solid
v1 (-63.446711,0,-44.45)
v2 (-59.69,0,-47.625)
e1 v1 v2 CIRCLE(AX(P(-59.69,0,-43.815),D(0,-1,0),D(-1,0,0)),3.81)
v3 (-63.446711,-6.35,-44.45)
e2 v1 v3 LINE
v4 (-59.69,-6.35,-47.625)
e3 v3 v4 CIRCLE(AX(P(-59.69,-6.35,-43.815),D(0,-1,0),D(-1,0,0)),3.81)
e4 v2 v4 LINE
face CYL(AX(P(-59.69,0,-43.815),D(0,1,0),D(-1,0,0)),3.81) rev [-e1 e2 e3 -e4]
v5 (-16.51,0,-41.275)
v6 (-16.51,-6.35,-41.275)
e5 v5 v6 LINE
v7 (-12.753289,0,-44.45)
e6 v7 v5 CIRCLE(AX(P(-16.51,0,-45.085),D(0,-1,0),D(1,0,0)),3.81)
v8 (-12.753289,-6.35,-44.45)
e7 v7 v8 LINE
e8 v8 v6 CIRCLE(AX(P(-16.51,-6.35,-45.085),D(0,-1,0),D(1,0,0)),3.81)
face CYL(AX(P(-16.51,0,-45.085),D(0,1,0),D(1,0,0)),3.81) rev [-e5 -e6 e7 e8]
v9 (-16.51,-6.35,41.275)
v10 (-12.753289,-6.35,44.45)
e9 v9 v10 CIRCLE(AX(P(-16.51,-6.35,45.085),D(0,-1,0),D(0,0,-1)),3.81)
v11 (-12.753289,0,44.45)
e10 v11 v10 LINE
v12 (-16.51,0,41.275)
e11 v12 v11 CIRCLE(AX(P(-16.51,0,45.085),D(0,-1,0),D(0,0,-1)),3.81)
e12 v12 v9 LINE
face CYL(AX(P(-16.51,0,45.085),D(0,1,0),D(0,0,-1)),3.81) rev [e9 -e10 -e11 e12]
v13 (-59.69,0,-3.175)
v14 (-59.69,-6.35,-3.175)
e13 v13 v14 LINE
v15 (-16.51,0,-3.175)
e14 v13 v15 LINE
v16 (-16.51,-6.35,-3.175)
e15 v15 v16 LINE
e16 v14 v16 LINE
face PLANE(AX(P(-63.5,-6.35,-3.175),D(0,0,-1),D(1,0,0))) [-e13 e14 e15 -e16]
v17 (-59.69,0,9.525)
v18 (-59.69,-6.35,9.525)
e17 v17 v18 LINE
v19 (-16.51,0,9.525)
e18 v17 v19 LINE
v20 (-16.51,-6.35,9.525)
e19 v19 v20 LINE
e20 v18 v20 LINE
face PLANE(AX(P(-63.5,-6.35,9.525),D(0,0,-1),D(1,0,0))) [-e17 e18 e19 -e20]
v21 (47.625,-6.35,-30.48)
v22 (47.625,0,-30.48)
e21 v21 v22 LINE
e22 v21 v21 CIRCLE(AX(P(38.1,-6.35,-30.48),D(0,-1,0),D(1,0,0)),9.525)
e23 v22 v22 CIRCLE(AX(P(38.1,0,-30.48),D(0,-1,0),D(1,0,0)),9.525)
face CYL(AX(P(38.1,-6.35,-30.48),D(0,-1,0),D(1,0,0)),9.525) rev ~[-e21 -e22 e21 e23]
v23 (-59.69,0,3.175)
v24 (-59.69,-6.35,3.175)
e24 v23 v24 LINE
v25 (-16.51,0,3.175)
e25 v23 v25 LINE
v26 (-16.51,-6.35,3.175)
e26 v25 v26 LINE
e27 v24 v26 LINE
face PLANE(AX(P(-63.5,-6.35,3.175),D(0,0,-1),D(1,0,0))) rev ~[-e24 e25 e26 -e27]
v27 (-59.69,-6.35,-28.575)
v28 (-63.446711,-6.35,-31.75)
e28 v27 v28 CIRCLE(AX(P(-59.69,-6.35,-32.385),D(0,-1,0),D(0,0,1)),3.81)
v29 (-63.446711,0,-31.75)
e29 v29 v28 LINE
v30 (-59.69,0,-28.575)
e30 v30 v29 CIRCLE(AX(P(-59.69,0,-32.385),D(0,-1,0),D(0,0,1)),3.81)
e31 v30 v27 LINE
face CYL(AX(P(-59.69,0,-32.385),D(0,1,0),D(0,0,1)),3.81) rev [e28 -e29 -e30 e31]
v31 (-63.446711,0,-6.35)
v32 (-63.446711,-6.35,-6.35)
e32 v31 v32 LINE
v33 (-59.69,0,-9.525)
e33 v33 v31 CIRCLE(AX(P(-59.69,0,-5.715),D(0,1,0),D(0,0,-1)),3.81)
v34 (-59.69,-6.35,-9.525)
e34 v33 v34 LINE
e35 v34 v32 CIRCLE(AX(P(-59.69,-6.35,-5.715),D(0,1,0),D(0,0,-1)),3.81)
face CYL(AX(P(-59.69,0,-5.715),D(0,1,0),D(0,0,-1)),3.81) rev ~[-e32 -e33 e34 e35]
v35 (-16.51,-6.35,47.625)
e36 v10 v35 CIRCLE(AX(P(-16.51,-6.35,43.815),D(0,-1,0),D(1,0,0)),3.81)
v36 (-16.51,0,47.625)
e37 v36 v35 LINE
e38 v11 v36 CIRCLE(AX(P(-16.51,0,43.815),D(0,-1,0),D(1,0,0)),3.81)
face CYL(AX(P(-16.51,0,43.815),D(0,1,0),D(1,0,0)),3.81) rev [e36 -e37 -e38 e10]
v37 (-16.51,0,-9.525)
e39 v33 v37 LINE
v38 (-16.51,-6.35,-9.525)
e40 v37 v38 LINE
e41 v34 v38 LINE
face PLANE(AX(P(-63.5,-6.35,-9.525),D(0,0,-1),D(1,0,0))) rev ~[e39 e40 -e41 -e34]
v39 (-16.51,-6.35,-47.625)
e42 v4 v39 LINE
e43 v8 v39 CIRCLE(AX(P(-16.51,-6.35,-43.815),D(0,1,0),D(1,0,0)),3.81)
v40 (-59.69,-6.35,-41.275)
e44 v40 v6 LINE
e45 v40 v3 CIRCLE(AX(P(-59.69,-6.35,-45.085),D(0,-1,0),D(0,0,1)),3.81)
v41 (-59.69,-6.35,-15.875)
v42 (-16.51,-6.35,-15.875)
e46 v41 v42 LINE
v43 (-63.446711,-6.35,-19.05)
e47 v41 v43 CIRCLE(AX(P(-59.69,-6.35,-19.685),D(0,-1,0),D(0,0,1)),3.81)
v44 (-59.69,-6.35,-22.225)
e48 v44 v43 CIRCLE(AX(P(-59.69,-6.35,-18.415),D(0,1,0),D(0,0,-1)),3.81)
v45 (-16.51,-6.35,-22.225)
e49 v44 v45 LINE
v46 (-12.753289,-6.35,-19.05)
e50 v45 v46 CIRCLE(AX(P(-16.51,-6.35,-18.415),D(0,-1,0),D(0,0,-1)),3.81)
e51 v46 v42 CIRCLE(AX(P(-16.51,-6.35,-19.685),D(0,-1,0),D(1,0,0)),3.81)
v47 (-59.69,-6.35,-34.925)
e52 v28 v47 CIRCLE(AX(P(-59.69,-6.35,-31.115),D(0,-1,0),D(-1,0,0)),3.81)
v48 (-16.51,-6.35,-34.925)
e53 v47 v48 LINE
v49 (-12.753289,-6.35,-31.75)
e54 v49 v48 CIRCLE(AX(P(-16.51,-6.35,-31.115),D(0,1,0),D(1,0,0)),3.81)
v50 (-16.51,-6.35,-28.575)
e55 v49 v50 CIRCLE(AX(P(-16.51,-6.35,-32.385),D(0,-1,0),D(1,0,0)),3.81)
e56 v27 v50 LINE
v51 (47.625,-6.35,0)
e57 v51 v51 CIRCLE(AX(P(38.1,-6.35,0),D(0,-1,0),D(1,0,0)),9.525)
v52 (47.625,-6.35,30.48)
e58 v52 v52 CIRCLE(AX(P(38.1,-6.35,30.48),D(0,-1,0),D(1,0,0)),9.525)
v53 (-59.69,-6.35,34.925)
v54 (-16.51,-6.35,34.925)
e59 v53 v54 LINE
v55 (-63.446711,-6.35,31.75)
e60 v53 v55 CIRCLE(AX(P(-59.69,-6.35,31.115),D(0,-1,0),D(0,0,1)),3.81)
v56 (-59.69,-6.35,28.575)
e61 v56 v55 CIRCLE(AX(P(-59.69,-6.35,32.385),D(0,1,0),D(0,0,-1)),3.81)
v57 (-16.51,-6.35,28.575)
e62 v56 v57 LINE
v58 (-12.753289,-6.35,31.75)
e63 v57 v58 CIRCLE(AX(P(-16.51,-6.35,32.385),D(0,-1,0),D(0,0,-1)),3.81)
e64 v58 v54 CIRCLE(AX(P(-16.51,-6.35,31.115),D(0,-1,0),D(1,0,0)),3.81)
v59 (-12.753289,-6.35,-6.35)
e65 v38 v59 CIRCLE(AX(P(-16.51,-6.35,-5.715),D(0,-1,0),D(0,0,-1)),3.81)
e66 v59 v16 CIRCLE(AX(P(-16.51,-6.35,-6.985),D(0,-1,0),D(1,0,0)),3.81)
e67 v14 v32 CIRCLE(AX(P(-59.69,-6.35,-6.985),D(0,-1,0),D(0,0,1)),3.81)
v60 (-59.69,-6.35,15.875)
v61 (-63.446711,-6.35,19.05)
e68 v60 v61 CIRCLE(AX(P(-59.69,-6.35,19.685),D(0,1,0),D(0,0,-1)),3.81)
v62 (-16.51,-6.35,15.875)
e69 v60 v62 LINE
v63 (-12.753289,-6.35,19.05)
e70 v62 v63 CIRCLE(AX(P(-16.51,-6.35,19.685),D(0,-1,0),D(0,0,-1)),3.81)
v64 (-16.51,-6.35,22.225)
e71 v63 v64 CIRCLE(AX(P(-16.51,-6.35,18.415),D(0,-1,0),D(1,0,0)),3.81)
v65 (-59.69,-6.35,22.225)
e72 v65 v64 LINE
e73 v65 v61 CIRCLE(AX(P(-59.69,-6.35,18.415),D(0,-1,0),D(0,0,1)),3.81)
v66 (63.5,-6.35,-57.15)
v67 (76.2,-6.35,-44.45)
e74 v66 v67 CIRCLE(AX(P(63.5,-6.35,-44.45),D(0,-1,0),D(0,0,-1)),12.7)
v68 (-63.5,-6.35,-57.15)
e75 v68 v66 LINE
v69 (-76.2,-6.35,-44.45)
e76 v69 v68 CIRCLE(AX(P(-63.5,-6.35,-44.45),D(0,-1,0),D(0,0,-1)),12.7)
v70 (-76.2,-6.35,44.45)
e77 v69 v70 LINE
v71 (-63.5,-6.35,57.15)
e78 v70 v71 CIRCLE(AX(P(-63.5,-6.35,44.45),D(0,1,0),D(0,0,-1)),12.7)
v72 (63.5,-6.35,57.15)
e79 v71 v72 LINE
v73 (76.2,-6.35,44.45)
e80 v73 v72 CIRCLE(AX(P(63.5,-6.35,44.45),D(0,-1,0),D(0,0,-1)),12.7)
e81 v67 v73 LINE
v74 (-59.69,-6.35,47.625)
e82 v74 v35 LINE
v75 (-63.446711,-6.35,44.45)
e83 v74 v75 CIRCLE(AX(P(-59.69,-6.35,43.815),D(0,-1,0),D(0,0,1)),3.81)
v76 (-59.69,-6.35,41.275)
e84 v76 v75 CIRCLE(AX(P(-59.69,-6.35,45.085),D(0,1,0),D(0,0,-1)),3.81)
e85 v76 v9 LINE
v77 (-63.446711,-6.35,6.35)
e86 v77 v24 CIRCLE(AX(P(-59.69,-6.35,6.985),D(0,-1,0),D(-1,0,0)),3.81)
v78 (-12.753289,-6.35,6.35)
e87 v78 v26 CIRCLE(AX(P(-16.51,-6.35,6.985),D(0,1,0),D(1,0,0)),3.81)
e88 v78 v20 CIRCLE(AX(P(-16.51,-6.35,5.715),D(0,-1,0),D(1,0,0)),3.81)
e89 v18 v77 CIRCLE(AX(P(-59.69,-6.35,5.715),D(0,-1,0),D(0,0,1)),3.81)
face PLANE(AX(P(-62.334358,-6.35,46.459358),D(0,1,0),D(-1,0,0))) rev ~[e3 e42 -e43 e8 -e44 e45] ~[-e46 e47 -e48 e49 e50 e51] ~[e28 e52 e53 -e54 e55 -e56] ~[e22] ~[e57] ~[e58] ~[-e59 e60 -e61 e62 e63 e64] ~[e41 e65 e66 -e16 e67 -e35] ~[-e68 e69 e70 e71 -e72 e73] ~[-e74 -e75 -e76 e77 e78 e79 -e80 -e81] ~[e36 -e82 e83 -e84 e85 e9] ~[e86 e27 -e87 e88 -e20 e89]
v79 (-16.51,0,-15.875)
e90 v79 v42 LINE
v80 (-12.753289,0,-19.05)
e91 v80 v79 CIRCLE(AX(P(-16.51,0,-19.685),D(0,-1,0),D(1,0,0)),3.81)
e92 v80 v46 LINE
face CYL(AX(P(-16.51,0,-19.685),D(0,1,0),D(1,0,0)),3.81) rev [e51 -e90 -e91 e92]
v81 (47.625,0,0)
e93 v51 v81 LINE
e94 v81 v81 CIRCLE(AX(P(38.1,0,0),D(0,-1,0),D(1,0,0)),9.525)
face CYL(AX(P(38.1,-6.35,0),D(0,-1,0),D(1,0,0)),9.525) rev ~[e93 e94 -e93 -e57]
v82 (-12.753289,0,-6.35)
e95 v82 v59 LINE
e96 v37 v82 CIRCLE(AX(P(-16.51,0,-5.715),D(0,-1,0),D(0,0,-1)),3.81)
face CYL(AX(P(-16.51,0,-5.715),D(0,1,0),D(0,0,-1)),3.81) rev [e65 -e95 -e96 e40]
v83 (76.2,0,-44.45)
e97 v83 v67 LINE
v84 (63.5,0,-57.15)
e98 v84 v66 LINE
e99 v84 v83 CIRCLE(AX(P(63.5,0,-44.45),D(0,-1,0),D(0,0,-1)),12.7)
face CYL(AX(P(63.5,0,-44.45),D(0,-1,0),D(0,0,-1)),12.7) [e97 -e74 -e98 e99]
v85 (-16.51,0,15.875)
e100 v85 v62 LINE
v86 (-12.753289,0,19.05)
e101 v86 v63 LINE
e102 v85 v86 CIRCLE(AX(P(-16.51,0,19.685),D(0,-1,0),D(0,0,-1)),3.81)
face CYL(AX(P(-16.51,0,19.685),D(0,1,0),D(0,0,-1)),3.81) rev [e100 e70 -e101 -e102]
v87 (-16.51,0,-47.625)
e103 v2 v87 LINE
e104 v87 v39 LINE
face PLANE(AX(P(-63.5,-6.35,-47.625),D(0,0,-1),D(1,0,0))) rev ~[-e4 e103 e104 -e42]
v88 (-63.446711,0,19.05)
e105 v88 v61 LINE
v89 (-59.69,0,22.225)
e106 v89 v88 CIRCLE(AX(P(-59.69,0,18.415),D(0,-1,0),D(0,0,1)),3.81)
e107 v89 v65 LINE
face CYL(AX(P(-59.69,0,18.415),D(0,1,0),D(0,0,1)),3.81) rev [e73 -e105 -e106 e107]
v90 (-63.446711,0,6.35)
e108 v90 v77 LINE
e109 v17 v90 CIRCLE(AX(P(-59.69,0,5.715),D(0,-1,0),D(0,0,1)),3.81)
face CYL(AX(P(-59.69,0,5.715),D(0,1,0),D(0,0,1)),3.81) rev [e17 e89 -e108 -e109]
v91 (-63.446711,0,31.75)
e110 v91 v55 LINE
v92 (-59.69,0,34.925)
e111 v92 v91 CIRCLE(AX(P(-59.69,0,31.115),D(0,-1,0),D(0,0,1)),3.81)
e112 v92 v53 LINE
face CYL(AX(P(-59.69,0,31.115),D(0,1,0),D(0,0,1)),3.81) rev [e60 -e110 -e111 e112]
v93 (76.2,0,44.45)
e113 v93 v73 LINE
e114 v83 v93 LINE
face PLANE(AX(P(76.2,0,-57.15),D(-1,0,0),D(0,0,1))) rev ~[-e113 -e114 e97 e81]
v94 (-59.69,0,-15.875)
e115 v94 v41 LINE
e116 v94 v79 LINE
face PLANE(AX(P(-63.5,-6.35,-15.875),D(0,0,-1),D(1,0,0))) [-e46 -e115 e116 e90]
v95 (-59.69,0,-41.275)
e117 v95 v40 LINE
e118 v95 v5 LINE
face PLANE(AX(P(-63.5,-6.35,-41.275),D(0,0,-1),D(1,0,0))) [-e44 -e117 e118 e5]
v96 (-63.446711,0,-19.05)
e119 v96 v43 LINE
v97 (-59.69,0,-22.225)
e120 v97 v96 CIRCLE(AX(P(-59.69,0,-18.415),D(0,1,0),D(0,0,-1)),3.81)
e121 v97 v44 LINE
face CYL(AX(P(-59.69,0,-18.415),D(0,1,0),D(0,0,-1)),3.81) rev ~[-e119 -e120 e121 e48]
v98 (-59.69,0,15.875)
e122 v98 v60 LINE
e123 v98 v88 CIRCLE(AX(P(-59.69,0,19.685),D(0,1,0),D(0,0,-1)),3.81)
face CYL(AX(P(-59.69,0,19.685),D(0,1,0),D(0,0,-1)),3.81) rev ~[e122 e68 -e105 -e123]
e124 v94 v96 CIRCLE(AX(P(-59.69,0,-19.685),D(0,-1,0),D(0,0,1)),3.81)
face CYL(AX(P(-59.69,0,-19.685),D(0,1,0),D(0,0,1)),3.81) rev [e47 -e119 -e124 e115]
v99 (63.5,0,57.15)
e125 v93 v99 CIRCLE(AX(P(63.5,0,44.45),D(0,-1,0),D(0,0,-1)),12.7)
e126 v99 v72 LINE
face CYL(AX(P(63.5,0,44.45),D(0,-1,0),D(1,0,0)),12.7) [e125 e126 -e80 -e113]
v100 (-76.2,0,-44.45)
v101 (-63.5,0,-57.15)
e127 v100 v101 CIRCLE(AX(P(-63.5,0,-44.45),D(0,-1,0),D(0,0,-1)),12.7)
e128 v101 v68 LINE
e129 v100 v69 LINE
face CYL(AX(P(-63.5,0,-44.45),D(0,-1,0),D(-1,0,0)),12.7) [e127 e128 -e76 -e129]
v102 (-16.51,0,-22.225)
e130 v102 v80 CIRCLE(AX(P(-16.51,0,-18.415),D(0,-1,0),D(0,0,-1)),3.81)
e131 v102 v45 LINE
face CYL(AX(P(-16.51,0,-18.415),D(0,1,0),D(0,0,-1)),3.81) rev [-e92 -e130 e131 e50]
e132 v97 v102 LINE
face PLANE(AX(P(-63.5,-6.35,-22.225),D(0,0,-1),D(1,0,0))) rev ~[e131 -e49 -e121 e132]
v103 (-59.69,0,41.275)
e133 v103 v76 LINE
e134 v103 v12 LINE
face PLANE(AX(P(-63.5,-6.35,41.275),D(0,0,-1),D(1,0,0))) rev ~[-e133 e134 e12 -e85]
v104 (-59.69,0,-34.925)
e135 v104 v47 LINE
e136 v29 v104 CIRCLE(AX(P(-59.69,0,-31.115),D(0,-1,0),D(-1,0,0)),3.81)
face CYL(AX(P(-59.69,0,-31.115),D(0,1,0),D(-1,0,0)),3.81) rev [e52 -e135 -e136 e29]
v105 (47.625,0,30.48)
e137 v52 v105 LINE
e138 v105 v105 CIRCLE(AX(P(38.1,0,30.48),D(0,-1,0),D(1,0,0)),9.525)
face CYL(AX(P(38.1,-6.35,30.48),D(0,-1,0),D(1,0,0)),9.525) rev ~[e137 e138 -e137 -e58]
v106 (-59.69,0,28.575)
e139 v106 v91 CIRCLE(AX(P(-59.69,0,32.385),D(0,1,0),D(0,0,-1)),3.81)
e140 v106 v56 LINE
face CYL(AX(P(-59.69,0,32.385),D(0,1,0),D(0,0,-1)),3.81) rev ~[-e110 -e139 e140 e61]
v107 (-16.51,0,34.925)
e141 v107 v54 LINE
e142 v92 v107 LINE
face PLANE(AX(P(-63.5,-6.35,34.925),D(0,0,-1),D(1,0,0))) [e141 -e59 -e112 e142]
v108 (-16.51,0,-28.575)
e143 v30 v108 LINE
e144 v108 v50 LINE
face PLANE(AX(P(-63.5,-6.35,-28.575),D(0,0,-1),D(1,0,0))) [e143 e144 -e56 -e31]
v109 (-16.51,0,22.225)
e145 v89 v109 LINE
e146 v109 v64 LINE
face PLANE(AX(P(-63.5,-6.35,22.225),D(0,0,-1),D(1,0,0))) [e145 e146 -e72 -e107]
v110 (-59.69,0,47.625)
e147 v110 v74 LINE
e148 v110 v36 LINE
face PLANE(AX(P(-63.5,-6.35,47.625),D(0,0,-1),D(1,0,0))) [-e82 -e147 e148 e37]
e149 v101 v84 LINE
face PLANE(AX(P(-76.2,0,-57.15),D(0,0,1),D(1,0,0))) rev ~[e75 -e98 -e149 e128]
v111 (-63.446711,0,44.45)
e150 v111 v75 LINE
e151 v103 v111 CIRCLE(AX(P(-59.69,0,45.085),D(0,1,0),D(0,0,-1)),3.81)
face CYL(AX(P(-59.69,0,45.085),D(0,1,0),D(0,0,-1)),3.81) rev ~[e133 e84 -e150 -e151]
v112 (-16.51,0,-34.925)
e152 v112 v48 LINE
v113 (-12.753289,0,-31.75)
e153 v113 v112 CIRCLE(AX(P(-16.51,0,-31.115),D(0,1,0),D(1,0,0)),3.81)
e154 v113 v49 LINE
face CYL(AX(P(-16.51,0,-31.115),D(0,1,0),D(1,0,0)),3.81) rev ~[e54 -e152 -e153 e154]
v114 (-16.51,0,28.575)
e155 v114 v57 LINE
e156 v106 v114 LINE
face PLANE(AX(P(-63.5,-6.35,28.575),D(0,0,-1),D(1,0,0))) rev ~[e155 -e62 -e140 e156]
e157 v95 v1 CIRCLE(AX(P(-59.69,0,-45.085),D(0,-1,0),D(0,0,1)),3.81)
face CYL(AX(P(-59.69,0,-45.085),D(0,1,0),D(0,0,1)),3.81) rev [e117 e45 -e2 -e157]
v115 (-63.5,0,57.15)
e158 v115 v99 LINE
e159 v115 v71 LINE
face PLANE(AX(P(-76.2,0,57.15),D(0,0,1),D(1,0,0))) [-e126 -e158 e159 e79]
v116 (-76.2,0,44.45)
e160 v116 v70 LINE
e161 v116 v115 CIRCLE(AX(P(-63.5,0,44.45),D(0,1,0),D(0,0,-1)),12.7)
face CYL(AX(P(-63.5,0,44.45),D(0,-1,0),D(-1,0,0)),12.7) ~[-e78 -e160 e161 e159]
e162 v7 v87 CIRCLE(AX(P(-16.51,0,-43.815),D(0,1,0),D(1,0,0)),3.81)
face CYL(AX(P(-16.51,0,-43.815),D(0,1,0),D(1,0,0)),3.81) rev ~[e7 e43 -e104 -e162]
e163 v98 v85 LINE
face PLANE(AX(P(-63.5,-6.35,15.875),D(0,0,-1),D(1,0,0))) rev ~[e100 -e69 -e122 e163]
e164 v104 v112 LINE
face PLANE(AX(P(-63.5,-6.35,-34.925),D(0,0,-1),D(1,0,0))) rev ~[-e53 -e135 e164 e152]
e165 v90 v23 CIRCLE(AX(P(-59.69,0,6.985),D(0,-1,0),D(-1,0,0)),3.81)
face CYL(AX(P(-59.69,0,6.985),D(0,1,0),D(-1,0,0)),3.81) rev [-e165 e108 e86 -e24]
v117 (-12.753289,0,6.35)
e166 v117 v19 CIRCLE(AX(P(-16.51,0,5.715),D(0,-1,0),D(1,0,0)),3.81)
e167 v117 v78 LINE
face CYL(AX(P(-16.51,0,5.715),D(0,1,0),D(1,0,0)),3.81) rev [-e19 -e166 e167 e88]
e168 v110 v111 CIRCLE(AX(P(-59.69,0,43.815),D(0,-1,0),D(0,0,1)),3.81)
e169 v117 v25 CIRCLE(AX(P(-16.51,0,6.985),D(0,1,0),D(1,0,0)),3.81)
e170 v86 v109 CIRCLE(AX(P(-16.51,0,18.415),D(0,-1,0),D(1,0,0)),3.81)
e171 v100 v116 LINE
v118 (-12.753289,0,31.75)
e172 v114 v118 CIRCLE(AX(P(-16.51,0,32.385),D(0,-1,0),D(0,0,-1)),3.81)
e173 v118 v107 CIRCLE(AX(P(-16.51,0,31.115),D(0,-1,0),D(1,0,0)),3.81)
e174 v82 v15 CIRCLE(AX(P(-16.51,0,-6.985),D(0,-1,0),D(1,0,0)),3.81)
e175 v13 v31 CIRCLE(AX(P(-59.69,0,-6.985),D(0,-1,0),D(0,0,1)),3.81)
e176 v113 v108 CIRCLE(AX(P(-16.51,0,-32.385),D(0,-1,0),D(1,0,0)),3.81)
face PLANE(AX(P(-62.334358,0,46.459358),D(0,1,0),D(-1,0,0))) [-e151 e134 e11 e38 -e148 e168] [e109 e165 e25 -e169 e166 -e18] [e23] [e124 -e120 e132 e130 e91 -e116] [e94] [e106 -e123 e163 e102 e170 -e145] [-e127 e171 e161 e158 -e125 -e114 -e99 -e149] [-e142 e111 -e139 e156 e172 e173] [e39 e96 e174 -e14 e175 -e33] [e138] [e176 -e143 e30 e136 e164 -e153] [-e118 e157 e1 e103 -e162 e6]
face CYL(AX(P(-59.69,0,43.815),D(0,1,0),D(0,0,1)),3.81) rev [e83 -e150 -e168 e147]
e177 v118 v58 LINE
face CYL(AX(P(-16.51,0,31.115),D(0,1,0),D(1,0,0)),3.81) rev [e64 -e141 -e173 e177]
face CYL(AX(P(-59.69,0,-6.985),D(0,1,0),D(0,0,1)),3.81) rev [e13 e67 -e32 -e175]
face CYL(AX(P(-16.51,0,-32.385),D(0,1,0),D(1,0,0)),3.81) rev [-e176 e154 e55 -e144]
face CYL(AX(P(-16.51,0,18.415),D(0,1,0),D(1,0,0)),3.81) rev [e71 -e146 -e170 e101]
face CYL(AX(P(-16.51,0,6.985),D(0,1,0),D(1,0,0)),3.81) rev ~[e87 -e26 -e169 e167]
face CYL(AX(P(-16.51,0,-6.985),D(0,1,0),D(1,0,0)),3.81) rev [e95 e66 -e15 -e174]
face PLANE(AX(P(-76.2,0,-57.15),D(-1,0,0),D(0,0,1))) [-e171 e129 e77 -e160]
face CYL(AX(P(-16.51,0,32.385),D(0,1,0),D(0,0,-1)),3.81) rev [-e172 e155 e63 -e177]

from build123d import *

# Parameters (mm, degrees)
F0_W         = 152.4
F0_H         = 114.3
F1_DEPTH     = 6.35
F2_R         = 12.7
F3_R         = 9.525
F4_DEPTH     = 25.4
F5_R         = 9.525
F6_DEPTH     = 25.4
F7_R         = 9.525
F8_DEPTH     = 25.4
F16_W        = 50.8
F16_H        = 6.35
F15_W        = 50.8
F15_H        = 6.35
F14_W        = 50.8
F14_H        = 6.35
F13_W        = 50.8
F13_H        = 6.35
F12_W        = 50.8
F12_H        = 6.35
F11_W        = 50.8
F11_H        = 6.35
F10_W        = 50.8
F10_H        = 6.35
F9_W         = 50.8
F9_H         = 6.35
F17_DEPTH    = 25.4
F18_T1_DEPTH = 6.35
F19_T1_DEPTH = 6.35


# Not quite as in the source:
# - a fillet or chamfer that OpenCascade refuses, or shapes differently, is made with other operations: its cross-section is extruded or revolved along the edge and cut away or added


with BuildPart() as f1:
    # F0 (on Front) → F1 (new body)
    with BuildSketch(Plane.XZ):
        Rectangle(F0_W, F0_H)
    extrude(amount=F1_DEPTH)

    # F2
    f2_edges = [f1.edges().sort_by_distance(p)[0] for p in [
        (-76.2, -3.175, 57.15),
        (-76.2, -3.175, -57.15),
        (76.2, -3.175, -57.15),
        (76.2, -3.175, 57.15),
    ]]
    fillet(f2_edges, radius=F2_R)

    # F3 (on face) → F4 (cut)
    with BuildSketch(Plane.XZ.offset(6.35)):
        with Locations((38.1, 30.48)):
            Circle(F3_R)
    extrude(amount=-F4_DEPTH, mode=Mode.SUBTRACT)

    # F5 (on face) → F6 (cut)
    with BuildSketch(Plane.XZ.offset(6.35)):
        with Locations((38.1, 0)):
            Circle(F5_R)
    extrude(amount=-F6_DEPTH, mode=Mode.SUBTRACT)

    # F7 (on face) → F8 (cut)
    with BuildSketch(Plane.XZ.offset(6.35)):
        with Locations((38.1, -30.48)):
            Circle(F7_R)
    extrude(amount=-F8_DEPTH, mode=Mode.SUBTRACT)

    # F16 (on face) + F15 (on face) + F14 (on face) + F13 (on face) + F12 (on face) + F11 (on face) + F10 (on face) + F9 (on face) → F17 (cut)
    with BuildSketch(Plane.XZ.offset(6.35)):
        with Locations((-38.1, 44.45)):
            Rectangle(F16_W, F16_H)
    with BuildSketch(Plane.XZ.offset(6.35)):
        with Locations((-38.1, 31.75)):
            Rectangle(F15_W, F15_H)
    with BuildSketch(Plane.XZ.offset(6.35)):
        with Locations((-38.1, 19.05)):
            Rectangle(F14_W, F14_H)
    with BuildSketch(Plane.XZ.offset(6.35)):
        with Locations((-38.1, 6.35)):
            Rectangle(F13_W, F13_H)
    with BuildSketch(Plane.XZ.offset(6.35)):
        with Locations((-38.1, -6.35)):
            Rectangle(F12_W, F12_H)
    with BuildSketch(Plane.XZ.offset(6.35)):
        with Locations((-38.1, -19.05)):
            Rectangle(F11_W, F11_H)
    with BuildSketch(Plane.XZ.offset(6.35)):
        with Locations((-38.1, -31.75)):
            Rectangle(F10_W, F10_H)
    with BuildSketch(Plane.XZ.offset(6.35)):
        with Locations((-38.1, -44.45)):
            Rectangle(F9_W, F9_H)
    extrude(amount=-F17_DEPTH, mode=Mode.SUBTRACT)

    # F18: fillet of radius 3.81 on 16 edges, made by hand

    # F18_s2 → F18_t1 (join)
    with BuildSketch(Plane.XZ):
        with BuildLine():
            ThreePointArc((-12.7, 6.985), (-13.8159231637, 4.2909231637), (-16.51, 3.175))
            Line((-16.51, 3.175), (-12.7, 3.175))
            Line((-12.7, 3.175), (-12.7, 6.985))
        make_face()
        with BuildLine():
            ThreePointArc((-16.51, -9.525), (-13.8159231637, -8.4090768363), (-12.7, -5.715))
            Line((-12.7, -5.715), (-12.7, -9.525))
            Line((-12.7, -9.525), (-16.51, -9.525))
        make_face()
        with BuildLine():
            ThreePointArc((-12.7, -31.115), (-13.8159231637, -33.8090768363), (-16.51, -34.925))
            Line((-16.51, -34.925), (-12.7, -34.925))
            Line((-12.7, -34.925), (-12.7, -31.115))
        make_face()
        with BuildLine():
            ThreePointArc((-16.51, -22.225), (-13.8159231637, -21.1090768363), (-12.7, -18.415))
            Line((-12.7, -18.415), (-12.7, -22.225))
            Line((-12.7, -22.225), (-16.51, -22.225))
        make_face()
        with BuildLine():
            ThreePointArc((-12.7, -43.815), (-13.8159231637, -46.5090768363), (-16.51, -47.625))
            Line((-16.51, -47.625), (-12.7, -47.625))
            Line((-12.7, -47.625), (-12.7, -43.815))
        make_face()
        with BuildLine():
            ThreePointArc((-16.51, 15.875), (-13.8159231637, 16.9909231637), (-12.7, 19.685))
            Line((-12.7, 19.685), (-12.7, 15.875))
            Line((-12.7, 15.875), (-16.51, 15.875))
        make_face()
        with BuildLine():
            ThreePointArc((-16.51, 28.575), (-13.8159231637, 29.6909231637), (-12.7, 32.385))
            Line((-12.7, 32.385), (-12.7, 28.575))
            Line((-12.7, 28.575), (-16.51, 28.575))
        make_face()
        with BuildLine():
            ThreePointArc((-16.51, 41.275), (-13.8159231637, 42.3909231637), (-12.7, 45.085))
            Line((-12.7, 45.085), (-12.7, 41.275))
            Line((-12.7, 41.275), (-16.51, 41.275))
        make_face()
        with BuildLine():
            ThreePointArc((-12.7, -45.085), (-13.8159231637, -42.3909231637), (-16.51, -41.275))
            Line((-16.51, -41.275), (-12.7, -41.275))
            Line((-12.7, -41.275), (-12.7, -45.085))
        make_face()
        with BuildLine():
            ThreePointArc((-12.7, -32.385), (-13.8159231637, -29.6909231637), (-16.51, -28.575))
            Line((-16.51, -28.575), (-12.7, -28.575))
            Line((-12.7, -28.575), (-12.7, -32.385))
        make_face()
        with BuildLine():
            ThreePointArc((-12.7, -19.685), (-13.8159231637, -16.9909231637), (-16.51, -15.875))
            Line((-16.51, -15.875), (-12.7, -15.875))
            Line((-12.7, -15.875), (-12.7, -19.685))
        make_face()
        with BuildLine():
            ThreePointArc((-12.7, -6.985), (-13.8159231637, -4.2909231637), (-16.51, -3.175))
            Line((-16.51, -3.175), (-12.7, -3.175))
            Line((-12.7, -3.175), (-12.7, -6.985))
        make_face()
        with BuildLine():
            ThreePointArc((-12.7, 5.715), (-13.8159231637, 8.4090768363), (-16.51, 9.525))
            Line((-16.51, 9.525), (-12.7, 9.525))
            Line((-12.7, 9.525), (-12.7, 5.715))
        make_face()
        with BuildLine():
            ThreePointArc((-12.7, 18.415), (-13.8159231637, 21.1090768363), (-16.51, 22.225))
            Line((-16.51, 22.225), (-12.7, 22.225))
            Line((-12.7, 22.225), (-12.7, 18.415))
        make_face()
        with BuildLine():
            ThreePointArc((-12.7, 31.115), (-13.8159231637, 33.8090768363), (-16.51, 34.925))
            Line((-16.51, 34.925), (-12.7, 34.925))
            Line((-12.7, 34.925), (-12.7, 31.115))
        make_face()
        with BuildLine():
            ThreePointArc((-12.7, 43.815), (-13.8159231637, 46.5090768363), (-16.51, 47.625))
            Line((-16.51, 47.625), (-12.7, 47.625))
            Line((-12.7, 47.625), (-12.7, 43.815))
        make_face()
    extrude(amount=F18_T1_DEPTH)

    # F19: fillet of radius 3.81 on 16 edges, made by hand

    # F19_s2 → F19_t1 (join)
    with BuildSketch(Plane.XZ):
        with BuildLine():
            ThreePointArc((-59.69, 47.625), (-62.3840768363, 46.5090768363), (-63.5, 43.815))
            Line((-63.5, 43.815), (-63.5, 47.625))
            Line((-63.5, 47.625), (-59.69, 47.625))
        make_face()
        with BuildLine():
            ThreePointArc((-59.69, 34.925), (-62.3840768363, 33.8090768363), (-63.5, 31.115))
            Line((-63.5, 31.115), (-63.5, 34.925))
            Line((-63.5, 34.925), (-59.69, 34.925))
        make_face()
        with BuildLine():
            ThreePointArc((-59.69, 22.225), (-62.3840768363, 21.1090768363), (-63.5, 18.415))
            Line((-63.5, 18.415), (-63.5, 22.225))
            Line((-63.5, 22.225), (-59.69, 22.225))
        make_face()
        with BuildLine():
            ThreePointArc((-59.69, 9.525), (-62.3840768363, 8.4090768363), (-63.5, 5.715))
            Line((-63.5, 5.715), (-63.5, 9.525))
            Line((-63.5, 9.525), (-59.69, 9.525))
        make_face()
        with BuildLine():
            ThreePointArc((-59.69, -3.175), (-62.3840768363, -4.2909231637), (-63.5, -6.985))
            Line((-63.5, -6.985), (-63.5, -3.175))
            Line((-63.5, -3.175), (-59.69, -3.175))
        make_face()
        with BuildLine():
            ThreePointArc((-59.69, -15.875), (-62.3840768363, -16.9909231637), (-63.5, -19.685))
            Line((-63.5, -19.685), (-63.5, -15.875))
            Line((-63.5, -15.875), (-59.69, -15.875))
        make_face()
        with BuildLine():
            ThreePointArc((-59.69, -28.575), (-62.3840768363, -29.6909231637), (-63.5, -32.385))
            Line((-63.5, -32.385), (-63.5, -28.575))
            Line((-63.5, -28.575), (-59.69, -28.575))
        make_face()
        with BuildLine():
            ThreePointArc((-59.69, -41.275), (-62.3840768363, -42.3909231637), (-63.5, -45.085))
            Line((-63.5, -45.085), (-63.5, -41.275))
            Line((-63.5, -41.275), (-59.69, -41.275))
        make_face()
        with BuildLine():
            ThreePointArc((-59.69, 41.275), (-62.3840768363, 42.3909231637), (-63.5, 45.085))
            Line((-63.5, 45.085), (-63.5, 41.275))
            Line((-63.5, 41.275), (-59.69, 41.275))
        make_face()
        with BuildLine():
            ThreePointArc((-59.69, 28.575), (-62.3840768363, 29.6909231637), (-63.5, 32.385))
            Line((-63.5, 32.385), (-63.5, 28.575))
            Line((-63.5, 28.575), (-59.69, 28.575))
        make_face()
        with BuildLine():
            ThreePointArc((-59.69, 15.875), (-62.3840768363, 16.9909231637), (-63.5, 19.685))
            Line((-63.5, 19.685), (-63.5, 15.875))
            Line((-63.5, 15.875), (-59.69, 15.875))
        make_face()
        with BuildLine():
            ThreePointArc((-63.5, 6.985), (-62.3840768363, 4.2909231637), (-59.69, 3.175))
            Line((-59.69, 3.175), (-63.5, 3.175))
            Line((-63.5, 3.175), (-63.5, 6.985))
        make_face()
        with BuildLine():
            ThreePointArc((-59.69, -9.525), (-62.3840768363, -8.4090768363), (-63.5, -5.715))
            Line((-63.5, -5.715), (-63.5, -9.525))
            Line((-63.5, -9.525), (-59.69, -9.525))
        make_face()
        with BuildLine():
            ThreePointArc((-59.69, -22.225), (-62.3840768363, -21.1090768363), (-63.5, -18.415))
            Line((-63.5, -18.415), (-63.5, -22.225))
            Line((-63.5, -22.225), (-59.69, -22.225))
        make_face()
        with BuildLine():
            ThreePointArc((-63.5, -31.115), (-62.3840768363, -33.8090768363), (-59.69, -34.925))
            Line((-59.69, -34.925), (-63.5, -34.925))
            Line((-63.5, -34.925), (-63.5, -31.115))
        make_face()
        with BuildLine():
            ThreePointArc((-63.5, -43.815), (-62.3840768363, -46.5090768363), (-59.69, -47.625))
            Line((-59.69, -47.625), (-63.5, -47.625))
            Line((-63.5, -47.625), (-63.5, -43.815))
        make_face()
    extrude(amount=F19_T1_DEPTH)


solid = f1.part
